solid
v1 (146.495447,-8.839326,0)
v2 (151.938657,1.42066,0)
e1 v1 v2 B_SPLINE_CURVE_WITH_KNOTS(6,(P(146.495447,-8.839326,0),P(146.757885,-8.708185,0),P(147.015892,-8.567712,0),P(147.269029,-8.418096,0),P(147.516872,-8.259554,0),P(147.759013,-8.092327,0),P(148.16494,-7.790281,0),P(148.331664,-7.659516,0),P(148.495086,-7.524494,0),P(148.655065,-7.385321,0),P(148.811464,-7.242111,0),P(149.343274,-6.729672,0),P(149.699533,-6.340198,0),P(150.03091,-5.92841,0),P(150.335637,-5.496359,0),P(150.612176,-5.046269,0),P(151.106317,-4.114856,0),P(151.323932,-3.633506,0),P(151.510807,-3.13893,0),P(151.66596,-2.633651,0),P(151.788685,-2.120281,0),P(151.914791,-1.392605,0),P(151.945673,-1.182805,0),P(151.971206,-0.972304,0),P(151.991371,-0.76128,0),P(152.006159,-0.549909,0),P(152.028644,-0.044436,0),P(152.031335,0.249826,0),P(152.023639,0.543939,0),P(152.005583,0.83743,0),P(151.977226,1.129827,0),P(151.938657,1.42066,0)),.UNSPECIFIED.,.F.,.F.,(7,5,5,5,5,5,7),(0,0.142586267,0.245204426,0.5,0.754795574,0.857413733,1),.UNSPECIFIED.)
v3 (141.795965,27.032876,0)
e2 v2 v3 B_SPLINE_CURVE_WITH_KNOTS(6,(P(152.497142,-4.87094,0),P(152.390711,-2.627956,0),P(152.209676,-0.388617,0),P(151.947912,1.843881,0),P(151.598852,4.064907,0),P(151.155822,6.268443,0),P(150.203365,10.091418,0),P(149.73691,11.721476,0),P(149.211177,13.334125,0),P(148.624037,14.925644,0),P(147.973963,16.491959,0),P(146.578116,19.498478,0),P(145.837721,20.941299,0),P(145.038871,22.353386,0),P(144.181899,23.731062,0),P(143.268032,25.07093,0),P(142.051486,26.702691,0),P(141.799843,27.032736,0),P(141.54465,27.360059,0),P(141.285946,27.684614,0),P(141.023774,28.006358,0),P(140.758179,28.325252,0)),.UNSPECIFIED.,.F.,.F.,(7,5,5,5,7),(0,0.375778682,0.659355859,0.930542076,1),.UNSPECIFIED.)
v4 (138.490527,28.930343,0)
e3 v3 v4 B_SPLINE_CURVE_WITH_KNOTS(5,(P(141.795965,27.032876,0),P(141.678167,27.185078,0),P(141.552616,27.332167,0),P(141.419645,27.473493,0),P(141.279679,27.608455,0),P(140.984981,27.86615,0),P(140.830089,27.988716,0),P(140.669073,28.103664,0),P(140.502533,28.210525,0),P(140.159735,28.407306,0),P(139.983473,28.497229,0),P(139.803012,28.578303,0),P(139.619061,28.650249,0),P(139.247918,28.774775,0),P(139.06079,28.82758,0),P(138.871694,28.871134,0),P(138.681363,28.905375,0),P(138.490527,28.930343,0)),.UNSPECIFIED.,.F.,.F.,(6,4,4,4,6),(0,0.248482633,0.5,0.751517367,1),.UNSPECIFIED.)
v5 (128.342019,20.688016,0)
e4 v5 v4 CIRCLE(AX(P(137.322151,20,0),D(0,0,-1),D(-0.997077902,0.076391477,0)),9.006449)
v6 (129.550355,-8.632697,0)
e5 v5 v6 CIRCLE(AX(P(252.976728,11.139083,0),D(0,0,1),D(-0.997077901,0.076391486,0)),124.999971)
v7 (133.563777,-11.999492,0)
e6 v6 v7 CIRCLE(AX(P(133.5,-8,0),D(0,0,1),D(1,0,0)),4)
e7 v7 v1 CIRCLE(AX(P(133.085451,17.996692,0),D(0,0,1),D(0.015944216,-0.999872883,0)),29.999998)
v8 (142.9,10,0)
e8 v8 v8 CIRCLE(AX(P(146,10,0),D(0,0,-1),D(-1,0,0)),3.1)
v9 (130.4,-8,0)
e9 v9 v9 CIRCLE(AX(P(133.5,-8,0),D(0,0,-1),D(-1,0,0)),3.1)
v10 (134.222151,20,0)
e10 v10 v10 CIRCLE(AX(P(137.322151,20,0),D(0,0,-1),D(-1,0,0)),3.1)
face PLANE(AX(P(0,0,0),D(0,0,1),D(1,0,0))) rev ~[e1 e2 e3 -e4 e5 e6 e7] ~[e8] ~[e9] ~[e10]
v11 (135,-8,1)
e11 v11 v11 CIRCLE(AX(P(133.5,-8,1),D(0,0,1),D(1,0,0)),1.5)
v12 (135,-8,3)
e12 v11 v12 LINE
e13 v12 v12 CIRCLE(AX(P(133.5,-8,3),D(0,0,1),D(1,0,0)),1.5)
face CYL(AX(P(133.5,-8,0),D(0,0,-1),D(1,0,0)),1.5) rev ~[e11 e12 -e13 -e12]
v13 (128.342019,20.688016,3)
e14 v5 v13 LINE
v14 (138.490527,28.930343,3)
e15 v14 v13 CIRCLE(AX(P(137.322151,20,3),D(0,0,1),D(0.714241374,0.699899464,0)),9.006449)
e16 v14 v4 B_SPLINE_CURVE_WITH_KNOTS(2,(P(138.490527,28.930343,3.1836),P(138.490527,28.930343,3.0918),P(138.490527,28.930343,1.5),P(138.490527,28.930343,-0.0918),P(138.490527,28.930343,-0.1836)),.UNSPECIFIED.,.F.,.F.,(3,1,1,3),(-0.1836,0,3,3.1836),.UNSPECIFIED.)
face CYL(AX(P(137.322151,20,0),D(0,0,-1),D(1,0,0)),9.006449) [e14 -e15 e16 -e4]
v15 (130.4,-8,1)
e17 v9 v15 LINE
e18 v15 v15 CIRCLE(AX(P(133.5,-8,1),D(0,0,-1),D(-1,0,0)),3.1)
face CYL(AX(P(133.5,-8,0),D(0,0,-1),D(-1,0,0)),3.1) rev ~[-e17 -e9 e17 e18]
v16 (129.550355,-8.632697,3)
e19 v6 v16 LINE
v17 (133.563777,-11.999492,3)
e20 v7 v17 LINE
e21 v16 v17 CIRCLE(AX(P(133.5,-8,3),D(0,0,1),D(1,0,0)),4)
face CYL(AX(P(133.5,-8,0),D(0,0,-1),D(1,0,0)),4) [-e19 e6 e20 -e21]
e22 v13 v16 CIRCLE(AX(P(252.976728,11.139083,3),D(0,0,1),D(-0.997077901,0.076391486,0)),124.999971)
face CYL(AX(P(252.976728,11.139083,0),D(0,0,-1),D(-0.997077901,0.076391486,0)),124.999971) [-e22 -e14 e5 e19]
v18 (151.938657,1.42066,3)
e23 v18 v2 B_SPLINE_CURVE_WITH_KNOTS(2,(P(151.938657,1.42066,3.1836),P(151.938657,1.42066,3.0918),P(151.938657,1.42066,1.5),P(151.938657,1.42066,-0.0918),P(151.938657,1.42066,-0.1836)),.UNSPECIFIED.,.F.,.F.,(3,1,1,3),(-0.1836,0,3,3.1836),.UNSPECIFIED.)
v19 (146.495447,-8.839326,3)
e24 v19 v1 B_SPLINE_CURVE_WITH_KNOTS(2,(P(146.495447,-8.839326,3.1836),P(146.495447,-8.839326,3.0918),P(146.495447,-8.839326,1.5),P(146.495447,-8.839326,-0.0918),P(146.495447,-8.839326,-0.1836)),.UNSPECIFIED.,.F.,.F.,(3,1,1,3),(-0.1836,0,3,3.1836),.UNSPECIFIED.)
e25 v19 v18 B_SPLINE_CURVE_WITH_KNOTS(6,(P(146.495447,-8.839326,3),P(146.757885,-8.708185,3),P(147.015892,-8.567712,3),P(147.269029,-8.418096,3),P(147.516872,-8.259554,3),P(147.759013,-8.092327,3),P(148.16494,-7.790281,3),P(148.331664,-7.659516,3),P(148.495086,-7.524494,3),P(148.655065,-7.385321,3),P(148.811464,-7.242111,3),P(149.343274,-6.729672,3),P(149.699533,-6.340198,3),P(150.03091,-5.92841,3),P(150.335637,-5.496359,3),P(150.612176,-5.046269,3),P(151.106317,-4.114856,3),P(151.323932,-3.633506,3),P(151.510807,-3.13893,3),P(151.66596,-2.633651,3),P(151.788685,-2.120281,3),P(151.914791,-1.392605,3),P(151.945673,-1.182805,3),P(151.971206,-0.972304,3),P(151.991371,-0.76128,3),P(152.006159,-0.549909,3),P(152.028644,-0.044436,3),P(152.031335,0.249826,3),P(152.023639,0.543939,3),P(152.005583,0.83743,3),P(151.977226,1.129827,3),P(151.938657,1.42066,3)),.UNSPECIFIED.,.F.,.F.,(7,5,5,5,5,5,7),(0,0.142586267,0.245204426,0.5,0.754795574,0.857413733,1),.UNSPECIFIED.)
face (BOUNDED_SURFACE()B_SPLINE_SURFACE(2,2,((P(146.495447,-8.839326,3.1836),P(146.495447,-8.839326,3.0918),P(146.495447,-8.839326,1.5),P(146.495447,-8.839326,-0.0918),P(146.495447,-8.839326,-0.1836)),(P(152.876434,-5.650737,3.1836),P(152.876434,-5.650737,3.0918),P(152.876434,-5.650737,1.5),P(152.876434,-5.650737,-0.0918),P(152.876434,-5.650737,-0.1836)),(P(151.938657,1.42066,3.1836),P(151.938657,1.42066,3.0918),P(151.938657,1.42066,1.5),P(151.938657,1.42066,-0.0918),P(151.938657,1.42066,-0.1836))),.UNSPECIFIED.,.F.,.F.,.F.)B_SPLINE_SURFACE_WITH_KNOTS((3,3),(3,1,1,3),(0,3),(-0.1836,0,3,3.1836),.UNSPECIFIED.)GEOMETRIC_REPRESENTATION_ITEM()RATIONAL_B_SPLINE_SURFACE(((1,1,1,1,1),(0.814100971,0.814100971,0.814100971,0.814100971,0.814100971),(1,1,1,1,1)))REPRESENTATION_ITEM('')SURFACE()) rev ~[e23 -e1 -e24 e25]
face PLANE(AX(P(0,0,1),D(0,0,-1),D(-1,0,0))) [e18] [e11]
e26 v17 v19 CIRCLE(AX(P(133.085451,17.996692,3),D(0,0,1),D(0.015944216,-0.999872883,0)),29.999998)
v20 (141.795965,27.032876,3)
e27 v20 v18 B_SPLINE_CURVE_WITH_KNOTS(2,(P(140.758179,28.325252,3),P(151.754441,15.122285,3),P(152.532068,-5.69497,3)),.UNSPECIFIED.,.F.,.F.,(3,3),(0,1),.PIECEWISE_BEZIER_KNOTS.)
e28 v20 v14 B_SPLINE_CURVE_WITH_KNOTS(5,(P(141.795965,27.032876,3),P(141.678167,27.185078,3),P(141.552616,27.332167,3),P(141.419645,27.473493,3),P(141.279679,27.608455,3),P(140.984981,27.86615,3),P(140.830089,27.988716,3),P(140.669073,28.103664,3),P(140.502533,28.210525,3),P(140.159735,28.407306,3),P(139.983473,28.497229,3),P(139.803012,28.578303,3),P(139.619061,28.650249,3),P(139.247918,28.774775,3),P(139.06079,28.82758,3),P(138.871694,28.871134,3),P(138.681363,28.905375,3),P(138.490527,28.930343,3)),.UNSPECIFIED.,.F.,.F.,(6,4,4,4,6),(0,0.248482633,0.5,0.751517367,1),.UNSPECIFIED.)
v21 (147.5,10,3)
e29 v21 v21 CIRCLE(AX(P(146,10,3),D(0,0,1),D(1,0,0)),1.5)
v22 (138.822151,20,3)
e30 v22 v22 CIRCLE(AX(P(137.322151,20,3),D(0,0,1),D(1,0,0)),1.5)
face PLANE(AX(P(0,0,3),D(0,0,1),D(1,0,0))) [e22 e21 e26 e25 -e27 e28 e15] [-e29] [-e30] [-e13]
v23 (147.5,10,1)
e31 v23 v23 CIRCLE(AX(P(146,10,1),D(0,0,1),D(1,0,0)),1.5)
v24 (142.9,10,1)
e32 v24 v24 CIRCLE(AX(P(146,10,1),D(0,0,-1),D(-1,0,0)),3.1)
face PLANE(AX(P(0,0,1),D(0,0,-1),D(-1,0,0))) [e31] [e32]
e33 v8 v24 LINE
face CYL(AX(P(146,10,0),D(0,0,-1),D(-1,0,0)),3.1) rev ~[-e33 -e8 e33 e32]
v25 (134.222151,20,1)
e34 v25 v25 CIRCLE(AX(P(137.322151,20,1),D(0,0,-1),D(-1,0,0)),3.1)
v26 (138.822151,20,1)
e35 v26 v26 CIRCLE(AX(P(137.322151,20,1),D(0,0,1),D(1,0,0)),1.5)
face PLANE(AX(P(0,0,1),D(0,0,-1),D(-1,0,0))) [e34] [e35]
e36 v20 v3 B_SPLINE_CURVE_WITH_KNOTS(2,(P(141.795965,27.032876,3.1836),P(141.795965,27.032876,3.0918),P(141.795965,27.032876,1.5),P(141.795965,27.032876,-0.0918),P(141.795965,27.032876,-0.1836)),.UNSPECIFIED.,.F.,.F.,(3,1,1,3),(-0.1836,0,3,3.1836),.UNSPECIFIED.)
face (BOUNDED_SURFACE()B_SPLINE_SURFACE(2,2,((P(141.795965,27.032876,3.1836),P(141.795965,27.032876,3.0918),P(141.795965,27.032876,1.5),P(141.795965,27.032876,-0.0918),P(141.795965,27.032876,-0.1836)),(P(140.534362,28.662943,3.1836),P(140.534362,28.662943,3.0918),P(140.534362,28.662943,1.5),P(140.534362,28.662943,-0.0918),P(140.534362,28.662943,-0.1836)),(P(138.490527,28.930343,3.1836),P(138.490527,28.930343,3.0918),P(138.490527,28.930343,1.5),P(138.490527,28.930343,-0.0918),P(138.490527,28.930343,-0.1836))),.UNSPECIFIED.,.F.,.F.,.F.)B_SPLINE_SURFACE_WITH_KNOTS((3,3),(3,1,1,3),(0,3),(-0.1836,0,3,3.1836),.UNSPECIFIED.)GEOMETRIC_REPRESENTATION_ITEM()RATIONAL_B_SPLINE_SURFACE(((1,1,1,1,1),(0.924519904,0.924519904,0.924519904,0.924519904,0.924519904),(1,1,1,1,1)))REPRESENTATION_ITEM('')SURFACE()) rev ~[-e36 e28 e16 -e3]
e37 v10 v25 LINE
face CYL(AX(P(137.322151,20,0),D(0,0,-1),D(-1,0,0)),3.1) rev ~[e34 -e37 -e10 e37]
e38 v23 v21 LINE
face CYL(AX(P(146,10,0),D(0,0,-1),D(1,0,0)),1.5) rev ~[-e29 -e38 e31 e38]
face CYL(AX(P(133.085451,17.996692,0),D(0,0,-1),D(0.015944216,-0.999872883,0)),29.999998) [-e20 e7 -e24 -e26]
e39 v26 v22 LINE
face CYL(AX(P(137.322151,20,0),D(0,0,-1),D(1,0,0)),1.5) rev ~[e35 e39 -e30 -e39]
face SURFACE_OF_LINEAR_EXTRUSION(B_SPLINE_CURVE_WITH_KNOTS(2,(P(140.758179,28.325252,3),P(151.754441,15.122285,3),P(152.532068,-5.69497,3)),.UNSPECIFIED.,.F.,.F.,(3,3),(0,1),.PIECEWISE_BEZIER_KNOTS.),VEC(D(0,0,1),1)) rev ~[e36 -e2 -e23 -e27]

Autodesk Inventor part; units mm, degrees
ref_plane "YZ Plane" through (0, 0, 0) normal (1, 0, 0) x (0, 1, 0)
ref_plane "XZ Plane" through (0, 0, 0) normal (0, 1, 0) x (-1, 0, 0)
ref_plane "XY Plane" through (0, 0, 0) normal (0, 0, 1) x (1, 0, 0)
sketch "スケッチ1" plane through (0, 0, 0) normal (0, 0, 1) x (1, 0, 0)
  line L0 (108, 72.831817) -> (108, -27.637331) construction
  circle A0 centre (90, 27) radius 3
  circle A1 centre (104.07345, 2) radius 6.025
  circle A2 centre (90, 27) radius 1.5
  circle A3 centre (104.07345, 2) radius 1.5
  circle A4 centre (82.04031, 11.281864) radius 1.5
  circle A5 centre (82.5, -8) radius 3
  circle A6 centre (82.5, -8) radius 1.5
  arc A7 (66.645247, -5.64) -> (72.915941, -4.36) centre (69.780594, -5) ccw
  arc A8 (72.724551, 23.828571) -> (66.645247, -5.64) centre (104.07345, 2) ccw
  arc A9 (77.976723, 20.171429) -> (72.915941, -4.36) centre (104.07345, 2) ccw
  arc A10 (77.976723, 20.171429) -> (72.724551, 23.828571) centre (75.350637, 22) ccw
  circle A11 centre (137.322151, 20) radius 1.25
  circle A12 centre (133.5, -8) radius 3
  circle A13 centre (133.5, -8) radius 1.5
  circle A14 centre (146, 10) radius 1.5
  arc A15 (-6.089587, 13.373015) -> (73.990447, 1.93301) centre (42.288654, 66.020578) ccw construction
  line L1 (108, 72.831817) -> (108, -27.637331) construction
  arc A16 (142.009553, 1.93301) -> (222.089587, 13.373015) centre (173.711346, 66.020578) ccw construction
  arc A17 (142.29705, -19.072921) -> (142.660887, 27.253552) centre (125.709293, 4.222021) ccw
  arc A18 (136.80781, 35.127338) -> (180.06622, 10.718677) centre (180.861669, 62.665248) ccw
  circle A19 centre (137.322151, 20) radius 9.006449
  arc A20 (128.322651, 20.353731) -> (130.555913, -8.5765) centre (253.226204, 15.444317) ccw
  arc A21 (133.414591, -10.998784) -> (152.948723, -4.485529) centre (134.268683, 18.989056) ccw
  arc A22 (35.93378, 10.718677) -> (79.19219, 35.127338) centre (35.138331, 62.665248) ccw
  arc A23 (73.339113, 27.253552) -> (73.70295, -19.072921) centre (90.290707, 4.222021) ccw
  arc A24 (90.887703, 29.865656) -> (71.118535, 25.188537) centre (84.969685, 10.761283) ccw
  arc A25 (109.559222, 4.491371) -> (92.075879, 29.165808) centre (36.719095, -28.589074) ccw
  arc A26 (80.567193, -10.294397) -> (70.653319, -16.566942) centre (76.603177, -15) ccw
  circle A27 centre (76.603177, -15) radius 5 construction
  circle A28 centre (94, -11) radius 1.5
  circle A29 centre (94, -11) radius 3
  arc A30 (103.111347, -3.947687) -> (84.657245, -10.084777) centre (99.757959, -24.678215) ccw
  line L2 (108, 72.831817) -> (108, -27.637331) construction
  circle A31 centre (90, 27) radius 3
  circle A32 centre (104.07345, 2) radius 6.025
  circle A33 centre (90, 27) radius 1.5
  circle A34 centre (104.07345, 2) radius 1.5
  circle A35 centre (82.04031, 11.281864) radius 1.5
  circle A36 centre (82.5, -8) radius 3
  circle A37 centre (82.5, -8) radius 1.5
  arc A38 (66.645247, -5.64) -> (72.915941, -4.36) centre (69.780594, -5) ccw
  arc A39 (72.724551, 23.828571) -> (66.645247, -5.64) centre (104.07345, 2) ccw
  arc A40 (77.976723, 20.171429) -> (72.915941, -4.36) centre (104.07345, 2) ccw
  arc A41 (77.976723, 20.171429) -> (72.724551, 23.828571) centre (75.350637, 22) ccw
  circle A42 centre (137.322151, 20) radius 1.25
  circle A43 centre (133.5, -8) radius 4
  circle A44 centre (133.5, -8) radius 1.5
  circle A45 centre (146, 10) radius 1.5
  arc A46 (-6.089587, 13.373015) -> (73.990447, 1.93301) centre (42.288654, 66.020578) ccw construction
  line L3 (108, 72.831817) -> (108, -27.637331) construction
  arc A47 (142.009553, 1.93301) -> (222.089587, 13.373015) centre (173.711346, 66.020578) ccw construction
  arc A48 (142.29705, -19.072921) -> (142.660887, 27.253552) centre (125.709293, 4.222021) ccw
  arc A49 (136.80781, 35.127338) -> (180.06622, 10.718677) centre (180.861669, 62.665248) ccw
  circle A50 centre (137.322151, 20) radius 9.006449
  arc A51 (128.342019, 20.688016) -> (129.550355, -8.632697) centre (252.976757, 11.139082) ccw
  arc A52 (133.563777, -11.999492) -> (152.948723, -4.485529) centre (133.08545, 17.996695) ccw
  arc A53 (35.93378, 10.718677) -> (79.19219, 35.127338) centre (35.138331, 62.665248) ccw
  arc A54 (73.339113, 27.253552) -> (73.70295, -19.072921) centre (90.290707, 4.222021) ccw
  arc A55 (90.887703, 29.865656) -> (71.118535, 25.188537) centre (84.969685, 10.761283) ccw
  arc A56 (109.559222, 4.491371) -> (92.075879, 29.165808) centre (36.719095, -28.589074) ccw
  arc A57 (80.567193, -10.294397) -> (70.653319, -16.566942) centre (76.603177, -15) ccw
  circle A58 centre (76.603177, -15) radius 5 construction
  circle A59 centre (94, -11) radius 1.5
  circle A60 centre (94, -11) radius 3
  arc A61 (103.111347, -3.947687) -> (84.657245, -10.084777) centre (99.757959, -24.678215) ccw
  circle A62 centre (137.322151, 20) radius 1.5
  point P0 (0, 0)
  point P1 (0, 0)
  point P2 (0, 0)
  point P3 (153.490711, -2.560367)
  point P4 (70.420594, -8.135347)
  point P5 (68.814065, 23.104865)
  point P6 (143.754929, 26.303609)
  point P7 (147.185935, 23.104865)
  point P8 (0, 0)
  point P9 (153.490711, -2.560367)
  point P10 (152.948723, -4.485529)
  dimension "d0" = 2
  dimension "d1" = 30
  dimension "d2" = 125
  dimension "d3" = 80
  dimension "d4" = 20
  dimension "d5" = 6
  dimension "d6" = 21
  dimension "d14" = 2
  dimension "d15" = 30
  dimension "d16" = 125
  dimension "d17" = 80
  dimension "d18" = 20
  dimension "d19" = 6
  dimension "d20" = 21
  dimension "d25" = 3
extrude "押し出し1" add sketch "スケッチ1" along normal blind 3 contours A12 | A12 A20 A43 A21 | A12 A21 A43 A20 | A43 A51 A19 A20 | A20 A19 A18 A17 A21 A43 | A21 A52 A43 | A19
fillet "フィレット1" radius 3 1 edges at (152.9487, -4.4855, 1.5)
fillet "フィレット2" radius 5 1 edges at (147.1859, 23.1049, 1.5)
sketch "スケッチ3" plane through (0, 0, 0) normal (0, 0, -1) x (-1, 0, 0)
  arc A0 (-146.917757, 23.334729) -> (-147.45257, 22.797215) centre (-143.650945, 19.549502) ccw
  arc A1 (-147.45257, 22.797215) -> (-153.216482, -3.598627) centre (-125.709293, 4.222021) ccw
  arc A2 (-152.246999, -5.086525) -> (-133.563777, -11.999492) centre (-133.08545, 17.996695) ccw
  arc A3 (-133.563777, -11.999492) -> (-129.550355, -8.632697) centre (-133.5, -8) ccw
  arc A4 (-129.550355, -8.632697) -> (-128.342019, 20.688016) centre (-252.976757, 11.139082) ccw
  arc A5 (-128.342019, 20.688016) -> (-143.754929, 26.303609) centre (-137.322151, 20) ccw
  arc A6 (-146.917757, 23.334729) -> (-143.754929, 26.303609) centre (-180.861669, 62.665248) ccw
  circle A7 centre (-133.5, -8) radius 1.5
  circle A8 centre (-146, 10) radius 1.5
  circle A9 centre (-137.322151, 20) radius 3.1
  circle A10 centre (-146, 10) radius 3.1
  circle A11 centre (-133.5, -8) radius 3.1
  arc A12 (-153.216482, -3.598627) -> (-152.246999, -5.086525) centre (-150.330844, -2.778203) ccw
  circle A13 centre (-137.322151, 20) radius 1.5
  point P0 (0, 0)
  dimension "d21" = 6.2
  dimension "d22" = 6.2
  dimension "d23" = 6.2
extrude "押し出し2" cut sketch "スケッチ3" against normal blind 1 contours A9 | A10 | A11
sketch "スケッチ4" plane through (0, 0, 3) normal (0, 0, 1) x (1, 0, 0)
  arc A0 (147.45257, 22.797215) -> (146.917757, 23.334729) centre (143.650945, 19.549502) ccw
  arc A1 (143.754929, 26.303609) -> (146.917757, 23.334729) centre (180.861669, 62.665248) ccw
  arc A2 (143.754929, 26.303609) -> (128.342019, 20.688016) centre (137.322151, 20) ccw
  arc A3 (128.342019, 20.688016) -> (129.550355, -8.632697) centre (252.976757, 11.139082) ccw
  arc A4 (129.550355, -8.632697) -> (133.563777, -11.999492) centre (133.5, -8) ccw
  arc A5 (133.563777, -11.999492) -> (152.246999, -5.086525) centre (133.08545, 17.996695) ccw
  arc A6 (152.246999, -5.086525) -> (153.216482, -3.598627) centre (150.330844, -2.778203) ccw
  arc A7 (153.216482, -3.598627) -> (147.45257, 22.797215) centre (125.709293, 4.222021) ccw
  circle A8 centre (146, 10) radius 1.5
  circle A9 centre (137.322151, 20) radius 1.5
  circle A10 centre (133.5, -8) radius 1.5
  arc A11 (153.216482, -3.598627) -> (147.45257, 22.797215) centre (125.709293, 4.222021) ccw
  arc A12 (143.754929, 26.303609) -> (128.342019, 20.688016) centre (137.322151, 20) ccw
  spline S0 degree 2 poles (140.758179, 28.325252) (151.754441, 15.122285) (152.532068, -5.69497) knots 0 0 0 1 1 1
  circle A13 centre (146, 10) radius 3.1
  point P0 (0, 0)
  point P1 (148.894459, 14.077022)
  point P2 (140.758179, 28.325252)
  point P3 (153.361481, -3.069376)
  point P4 (152.496355, -4.854392)
  dimension "d36" = 5
  dimension "d37" = 13
  dimension "d38" = 17
  dimension "d39" = 36
extrude "押し出し3" cut sketch "スケッチ4" against normal blind 10 contours A7 A6 S0 A2 A1 A0
fillet "フィレット3" radius 10 1 edges at (152.4964, -4.8544, 1.5)
fillet "フィレット4" radius 5 1 edges at (140.7582, 28.3253, 1.5)
properties part number "アンノーン後" material "アルミニウム 2014-T4"
